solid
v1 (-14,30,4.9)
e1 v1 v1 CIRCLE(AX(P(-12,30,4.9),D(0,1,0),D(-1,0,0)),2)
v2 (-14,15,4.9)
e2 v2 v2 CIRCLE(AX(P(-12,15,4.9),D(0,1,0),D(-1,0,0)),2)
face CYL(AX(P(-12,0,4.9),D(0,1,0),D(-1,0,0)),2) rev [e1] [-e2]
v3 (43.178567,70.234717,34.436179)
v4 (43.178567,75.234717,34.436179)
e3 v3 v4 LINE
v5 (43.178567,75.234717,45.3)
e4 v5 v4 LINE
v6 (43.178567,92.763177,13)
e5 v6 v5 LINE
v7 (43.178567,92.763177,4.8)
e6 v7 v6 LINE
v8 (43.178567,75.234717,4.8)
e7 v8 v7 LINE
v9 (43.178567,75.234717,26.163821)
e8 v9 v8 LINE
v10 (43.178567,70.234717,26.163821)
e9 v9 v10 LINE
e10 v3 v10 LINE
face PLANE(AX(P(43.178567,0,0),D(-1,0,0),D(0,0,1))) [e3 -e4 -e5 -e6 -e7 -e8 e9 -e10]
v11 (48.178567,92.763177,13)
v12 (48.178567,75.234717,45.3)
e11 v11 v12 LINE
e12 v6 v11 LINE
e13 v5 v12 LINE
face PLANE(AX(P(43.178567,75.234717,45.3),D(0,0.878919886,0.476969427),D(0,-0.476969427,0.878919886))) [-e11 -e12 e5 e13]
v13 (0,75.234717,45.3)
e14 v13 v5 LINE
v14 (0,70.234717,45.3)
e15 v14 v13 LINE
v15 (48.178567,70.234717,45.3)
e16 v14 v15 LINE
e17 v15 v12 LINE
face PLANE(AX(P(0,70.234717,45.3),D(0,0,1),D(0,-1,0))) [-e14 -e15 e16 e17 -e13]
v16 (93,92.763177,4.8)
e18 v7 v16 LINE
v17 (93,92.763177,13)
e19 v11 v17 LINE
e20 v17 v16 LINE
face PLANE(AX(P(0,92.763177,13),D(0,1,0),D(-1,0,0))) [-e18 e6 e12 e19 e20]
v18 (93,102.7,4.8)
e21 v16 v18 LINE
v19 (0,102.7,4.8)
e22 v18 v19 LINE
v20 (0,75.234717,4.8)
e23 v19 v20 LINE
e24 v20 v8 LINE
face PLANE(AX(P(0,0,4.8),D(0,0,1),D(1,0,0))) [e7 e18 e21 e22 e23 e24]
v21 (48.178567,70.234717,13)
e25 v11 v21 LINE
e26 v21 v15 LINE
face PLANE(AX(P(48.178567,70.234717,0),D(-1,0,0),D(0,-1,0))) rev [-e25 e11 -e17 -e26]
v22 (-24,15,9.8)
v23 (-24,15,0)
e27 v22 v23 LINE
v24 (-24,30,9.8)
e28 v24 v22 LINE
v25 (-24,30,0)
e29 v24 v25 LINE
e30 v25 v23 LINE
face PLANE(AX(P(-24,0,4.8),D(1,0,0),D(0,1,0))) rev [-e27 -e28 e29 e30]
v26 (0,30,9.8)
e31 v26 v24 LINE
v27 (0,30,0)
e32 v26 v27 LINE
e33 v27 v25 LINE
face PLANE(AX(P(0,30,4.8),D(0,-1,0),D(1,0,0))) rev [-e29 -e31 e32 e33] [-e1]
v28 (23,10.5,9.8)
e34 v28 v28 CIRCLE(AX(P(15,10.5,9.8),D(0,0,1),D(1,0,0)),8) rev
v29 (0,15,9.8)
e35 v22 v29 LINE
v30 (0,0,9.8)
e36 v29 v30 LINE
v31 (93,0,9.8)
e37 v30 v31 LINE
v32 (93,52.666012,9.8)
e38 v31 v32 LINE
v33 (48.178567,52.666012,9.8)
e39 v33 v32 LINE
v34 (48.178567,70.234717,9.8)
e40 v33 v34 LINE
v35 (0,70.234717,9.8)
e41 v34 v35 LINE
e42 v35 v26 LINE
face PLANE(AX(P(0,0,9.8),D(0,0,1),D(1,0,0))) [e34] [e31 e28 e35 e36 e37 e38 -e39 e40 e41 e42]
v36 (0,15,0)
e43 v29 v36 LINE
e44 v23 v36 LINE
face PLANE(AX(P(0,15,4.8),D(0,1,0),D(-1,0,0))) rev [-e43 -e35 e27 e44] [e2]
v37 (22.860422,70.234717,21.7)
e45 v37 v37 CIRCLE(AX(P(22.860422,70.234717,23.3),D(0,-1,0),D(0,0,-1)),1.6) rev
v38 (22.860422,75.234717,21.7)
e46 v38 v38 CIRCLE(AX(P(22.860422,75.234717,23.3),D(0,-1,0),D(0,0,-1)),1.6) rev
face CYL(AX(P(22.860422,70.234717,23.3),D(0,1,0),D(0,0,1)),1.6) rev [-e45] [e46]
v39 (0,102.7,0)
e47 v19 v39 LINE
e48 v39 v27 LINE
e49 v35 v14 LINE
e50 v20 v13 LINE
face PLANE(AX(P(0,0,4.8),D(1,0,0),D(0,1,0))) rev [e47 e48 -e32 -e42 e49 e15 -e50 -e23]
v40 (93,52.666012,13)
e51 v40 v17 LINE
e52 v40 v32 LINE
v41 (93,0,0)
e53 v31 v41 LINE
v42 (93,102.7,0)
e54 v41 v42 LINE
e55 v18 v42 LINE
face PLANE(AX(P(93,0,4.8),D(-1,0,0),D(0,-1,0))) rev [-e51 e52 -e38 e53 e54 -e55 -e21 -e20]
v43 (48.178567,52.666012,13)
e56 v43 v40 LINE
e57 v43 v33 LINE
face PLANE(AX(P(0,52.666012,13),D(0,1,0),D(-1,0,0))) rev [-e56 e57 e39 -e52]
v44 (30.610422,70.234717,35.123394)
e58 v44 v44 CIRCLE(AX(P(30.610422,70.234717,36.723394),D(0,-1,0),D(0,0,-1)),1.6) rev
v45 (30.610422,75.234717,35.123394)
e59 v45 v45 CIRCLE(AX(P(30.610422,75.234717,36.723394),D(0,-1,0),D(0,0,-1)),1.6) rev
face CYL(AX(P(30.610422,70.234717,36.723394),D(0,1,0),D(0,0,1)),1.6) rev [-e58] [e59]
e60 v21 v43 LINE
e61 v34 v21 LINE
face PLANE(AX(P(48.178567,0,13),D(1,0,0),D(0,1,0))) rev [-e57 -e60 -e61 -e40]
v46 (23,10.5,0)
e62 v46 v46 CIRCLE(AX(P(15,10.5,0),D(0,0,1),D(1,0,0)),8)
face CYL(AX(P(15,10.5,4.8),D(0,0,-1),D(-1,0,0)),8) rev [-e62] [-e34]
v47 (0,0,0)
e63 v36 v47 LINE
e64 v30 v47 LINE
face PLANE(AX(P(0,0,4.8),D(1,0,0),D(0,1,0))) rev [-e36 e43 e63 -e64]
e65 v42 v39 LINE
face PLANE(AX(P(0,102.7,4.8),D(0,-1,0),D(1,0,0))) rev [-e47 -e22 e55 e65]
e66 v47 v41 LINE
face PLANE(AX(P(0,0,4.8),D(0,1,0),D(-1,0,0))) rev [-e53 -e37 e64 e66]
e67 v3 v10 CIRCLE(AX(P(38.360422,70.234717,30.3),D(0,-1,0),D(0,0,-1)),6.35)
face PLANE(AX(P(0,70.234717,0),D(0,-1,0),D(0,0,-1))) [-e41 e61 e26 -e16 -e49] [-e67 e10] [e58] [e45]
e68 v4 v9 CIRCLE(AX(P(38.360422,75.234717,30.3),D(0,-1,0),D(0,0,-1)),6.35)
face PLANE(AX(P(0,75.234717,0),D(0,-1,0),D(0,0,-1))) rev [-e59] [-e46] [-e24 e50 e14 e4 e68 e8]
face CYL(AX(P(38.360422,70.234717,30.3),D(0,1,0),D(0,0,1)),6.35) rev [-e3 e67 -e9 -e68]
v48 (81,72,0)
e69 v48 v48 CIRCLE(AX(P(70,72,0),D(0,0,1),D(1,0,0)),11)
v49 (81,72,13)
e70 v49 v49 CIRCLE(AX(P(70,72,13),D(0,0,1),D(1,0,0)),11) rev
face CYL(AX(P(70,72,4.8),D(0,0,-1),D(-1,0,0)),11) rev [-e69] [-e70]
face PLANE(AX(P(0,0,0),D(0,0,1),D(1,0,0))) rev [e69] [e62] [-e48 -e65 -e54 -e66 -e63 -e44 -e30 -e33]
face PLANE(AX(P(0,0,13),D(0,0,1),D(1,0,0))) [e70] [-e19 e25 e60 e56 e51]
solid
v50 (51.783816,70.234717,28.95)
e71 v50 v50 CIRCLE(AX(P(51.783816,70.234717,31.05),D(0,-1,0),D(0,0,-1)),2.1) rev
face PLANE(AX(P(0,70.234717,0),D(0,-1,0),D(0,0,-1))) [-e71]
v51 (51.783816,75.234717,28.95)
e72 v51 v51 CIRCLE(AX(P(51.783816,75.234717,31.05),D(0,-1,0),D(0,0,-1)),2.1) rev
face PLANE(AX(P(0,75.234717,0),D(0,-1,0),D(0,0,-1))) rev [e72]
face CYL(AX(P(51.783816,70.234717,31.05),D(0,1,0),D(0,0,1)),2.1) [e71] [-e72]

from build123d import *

# Parameters (mm, degrees)
SKETCH1_R                 = 11
SKETCH1_R_2               = 8
BOSS_EXTRUDE1_DEPTH       = 4.8
SKETCH2_W                 = 44.821432693
SKETCH2_H                 = 40.097165435
SKETCH2_R                 = 11
BOSS_EXTRUDE2_DEPTH       = 8.2
SKETCH3_W                 = 24
SKETCH3_H                 = 15
SKETCH3_R                 = 8
BOSS_EXTRUDE3_DEPTH       = 5
BOSS_EXTRUDE4_OUTLINE_R   = 2.1
BOSS_EXTRUDE4_OUTLINE_W   = 48.178567307
BOSS_EXTRUDE4_OUTLINE_H   = 40.5
BOSS_EXTRUDE4_OUTLINE_R_2 = 1.6
BOSS_EXTRUDE4_OUTLINE_R_3 = 6.35
BOSS_EXTRUDE4_DEPTH       = 5
BOSS_EXTRUDE5_DEPTH       = 5
SKETCH6_W                 = 48.178567307
SKETCH6_H                 = 17.568704936
BOSS_EXTRUDE6_DEPTH       = 5
SKETCH8_R                 = 2
CUT_EXTRUDE1_DEPTH        = 127.437257167


# Read off the part's stored shape, not the designer's step: Boss-Extrude4
with BuildPart() as part:
    # Sketch1 → Boss-Extrude1 (new body)
    # profile 1 of 2: a face of its own
    with BuildSketch(Plane.XY):
        Polygon((0, 0), (93, 0), (93, 102.7), (0, 102.7), (0, 30), (-24, 30), (-24, 15), (0, 15), align=None)
        with Locations((15, 10.5)):
            Circle(SKETCH1_R, mode=Mode.SUBTRACT)
        with Locations((70, 72)):
            Circle(SKETCH1_R, mode=Mode.SUBTRACT)
    # profile 2 of 2: a face of its own
    with BuildSketch(Plane.XY):
        with BuildLine():
            ThreePointArc((26, 10.5), (8.48332569, 19.36188219), (11.721280738, 0))
            Line((11.721280738, 0), (18.278719262, 0))
            ThreePointArc((18.278719262, 0), (23.86188219, 3.98332569), (26, 10.5))
        make_face()
        with Locations((15, 10.5)):
            Circle(SKETCH1_R_2, mode=Mode.SUBTRACT)
    extrude(amount=BOSS_EXTRUDE1_DEPTH)

    # Sketch2 → Boss-Extrude2 (add)
    with BuildSketch(Plane.XY.offset(4.8)):
        with Locations((70.589283654, 72.714594712)):
            Rectangle(SKETCH2_W, SKETCH2_H)
        with Locations((70, 72)):
            Circle(SKETCH2_R, mode=Mode.SUBTRACT)
    extrude(amount=BOSS_EXTRUDE2_DEPTH)

    # Sketch3 → Boss-Extrude3 (add)
    # profile 1 of 2: a face of its own
    with BuildSketch(Plane.XY.offset(4.8)):
        with Locations((-12, 22.5)):
            Rectangle(SKETCH3_W, SKETCH3_H)
    # profile 2 of 2: a face of its own
    with BuildSketch(Plane.XY.offset(4.8)):
        Polygon((0, 30), (0, 15), (0, 0), (93, 0), (93, 52.666011994), (48.178567307, 52.666011994), (0, 52.666011994), align=None)
        with Locations((15, 10.5)):
            Circle(SKETCH3_R, mode=Mode.SUBTRACT)
    extrude(amount=BOSS_EXTRUDE3_DEPTH)

    # Boss-Extrude4 outline → Boss-Extrude4 (add)
    # profile 1 of 2: a face of its own
    with BuildSketch(Plane.XZ.offset(-75.23471693)):
        with Locations((51.783815806, 31.05)):
            Circle(BOSS_EXTRUDE4_OUTLINE_R)
    # profile 2 of 2: a face of its own
    with BuildSketch(Plane.XZ.offset(-75.23471693)):
        with Locations((24.089283654, 25.05)):
            Rectangle(BOSS_EXTRUDE4_OUTLINE_W, BOSS_EXTRUDE4_OUTLINE_H)
        with Locations((22.860422048, 23.3)):
            Circle(BOSS_EXTRUDE4_OUTLINE_R_2, mode=Mode.SUBTRACT)
        with Locations((38.360422048, 30.3)):
            Circle(BOSS_EXTRUDE4_OUTLINE_R_3, mode=Mode.SUBTRACT)
        with Locations((30.610422048, 36.723393759)):
            Circle(BOSS_EXTRUDE4_OUTLINE_R_2, mode=Mode.SUBTRACT)
        with Locations((46.110422048, 36.723393759)):
            Circle(BOSS_EXTRUDE4_OUTLINE_R_2, mode=Mode.SUBTRACT)
    extrude(amount=BOSS_EXTRUDE4_DEPTH)

    # Sketch5 → Boss-Extrude5 (add)
    with BuildSketch(Plane(origin=(48.178567307, 0, 0), x_dir=(0, 0, -1), z_dir=(1, 0, 0))):
        Polygon((-45.3, 75.23471693), (-13, 92.763177429), (-4.8, 92.763177429), (-4.8, 70.23471693), (-45.3, 70.23471693), align=None)
    extrude(amount=-BOSS_EXTRUDE5_DEPTH)

    # Sketch6 → Boss-Extrude6 (add)
    with BuildSketch(Plane.XY.offset(4.8)):
        with Locations((24.089283654, 61.450364462)):
            Rectangle(SKETCH6_W, SKETCH6_H)
    extrude(amount=BOSS_EXTRUDE6_DEPTH)

    # Sketch8 → Cut-Extrude1 (cut, through all)
    with BuildSketch(Plane(origin=(0, 30, 0), x_dir=(1, 0, 0), z_dir=(0, 1, 0))):
        with Locations(Location((-12, -4.9, 0), (0, 0, 180))):
            Circle(SKETCH8_R)
    extrude(amount=-CUT_EXTRUDE1_DEPTH, mode=Mode.SUBTRACT)


solid = part.part
